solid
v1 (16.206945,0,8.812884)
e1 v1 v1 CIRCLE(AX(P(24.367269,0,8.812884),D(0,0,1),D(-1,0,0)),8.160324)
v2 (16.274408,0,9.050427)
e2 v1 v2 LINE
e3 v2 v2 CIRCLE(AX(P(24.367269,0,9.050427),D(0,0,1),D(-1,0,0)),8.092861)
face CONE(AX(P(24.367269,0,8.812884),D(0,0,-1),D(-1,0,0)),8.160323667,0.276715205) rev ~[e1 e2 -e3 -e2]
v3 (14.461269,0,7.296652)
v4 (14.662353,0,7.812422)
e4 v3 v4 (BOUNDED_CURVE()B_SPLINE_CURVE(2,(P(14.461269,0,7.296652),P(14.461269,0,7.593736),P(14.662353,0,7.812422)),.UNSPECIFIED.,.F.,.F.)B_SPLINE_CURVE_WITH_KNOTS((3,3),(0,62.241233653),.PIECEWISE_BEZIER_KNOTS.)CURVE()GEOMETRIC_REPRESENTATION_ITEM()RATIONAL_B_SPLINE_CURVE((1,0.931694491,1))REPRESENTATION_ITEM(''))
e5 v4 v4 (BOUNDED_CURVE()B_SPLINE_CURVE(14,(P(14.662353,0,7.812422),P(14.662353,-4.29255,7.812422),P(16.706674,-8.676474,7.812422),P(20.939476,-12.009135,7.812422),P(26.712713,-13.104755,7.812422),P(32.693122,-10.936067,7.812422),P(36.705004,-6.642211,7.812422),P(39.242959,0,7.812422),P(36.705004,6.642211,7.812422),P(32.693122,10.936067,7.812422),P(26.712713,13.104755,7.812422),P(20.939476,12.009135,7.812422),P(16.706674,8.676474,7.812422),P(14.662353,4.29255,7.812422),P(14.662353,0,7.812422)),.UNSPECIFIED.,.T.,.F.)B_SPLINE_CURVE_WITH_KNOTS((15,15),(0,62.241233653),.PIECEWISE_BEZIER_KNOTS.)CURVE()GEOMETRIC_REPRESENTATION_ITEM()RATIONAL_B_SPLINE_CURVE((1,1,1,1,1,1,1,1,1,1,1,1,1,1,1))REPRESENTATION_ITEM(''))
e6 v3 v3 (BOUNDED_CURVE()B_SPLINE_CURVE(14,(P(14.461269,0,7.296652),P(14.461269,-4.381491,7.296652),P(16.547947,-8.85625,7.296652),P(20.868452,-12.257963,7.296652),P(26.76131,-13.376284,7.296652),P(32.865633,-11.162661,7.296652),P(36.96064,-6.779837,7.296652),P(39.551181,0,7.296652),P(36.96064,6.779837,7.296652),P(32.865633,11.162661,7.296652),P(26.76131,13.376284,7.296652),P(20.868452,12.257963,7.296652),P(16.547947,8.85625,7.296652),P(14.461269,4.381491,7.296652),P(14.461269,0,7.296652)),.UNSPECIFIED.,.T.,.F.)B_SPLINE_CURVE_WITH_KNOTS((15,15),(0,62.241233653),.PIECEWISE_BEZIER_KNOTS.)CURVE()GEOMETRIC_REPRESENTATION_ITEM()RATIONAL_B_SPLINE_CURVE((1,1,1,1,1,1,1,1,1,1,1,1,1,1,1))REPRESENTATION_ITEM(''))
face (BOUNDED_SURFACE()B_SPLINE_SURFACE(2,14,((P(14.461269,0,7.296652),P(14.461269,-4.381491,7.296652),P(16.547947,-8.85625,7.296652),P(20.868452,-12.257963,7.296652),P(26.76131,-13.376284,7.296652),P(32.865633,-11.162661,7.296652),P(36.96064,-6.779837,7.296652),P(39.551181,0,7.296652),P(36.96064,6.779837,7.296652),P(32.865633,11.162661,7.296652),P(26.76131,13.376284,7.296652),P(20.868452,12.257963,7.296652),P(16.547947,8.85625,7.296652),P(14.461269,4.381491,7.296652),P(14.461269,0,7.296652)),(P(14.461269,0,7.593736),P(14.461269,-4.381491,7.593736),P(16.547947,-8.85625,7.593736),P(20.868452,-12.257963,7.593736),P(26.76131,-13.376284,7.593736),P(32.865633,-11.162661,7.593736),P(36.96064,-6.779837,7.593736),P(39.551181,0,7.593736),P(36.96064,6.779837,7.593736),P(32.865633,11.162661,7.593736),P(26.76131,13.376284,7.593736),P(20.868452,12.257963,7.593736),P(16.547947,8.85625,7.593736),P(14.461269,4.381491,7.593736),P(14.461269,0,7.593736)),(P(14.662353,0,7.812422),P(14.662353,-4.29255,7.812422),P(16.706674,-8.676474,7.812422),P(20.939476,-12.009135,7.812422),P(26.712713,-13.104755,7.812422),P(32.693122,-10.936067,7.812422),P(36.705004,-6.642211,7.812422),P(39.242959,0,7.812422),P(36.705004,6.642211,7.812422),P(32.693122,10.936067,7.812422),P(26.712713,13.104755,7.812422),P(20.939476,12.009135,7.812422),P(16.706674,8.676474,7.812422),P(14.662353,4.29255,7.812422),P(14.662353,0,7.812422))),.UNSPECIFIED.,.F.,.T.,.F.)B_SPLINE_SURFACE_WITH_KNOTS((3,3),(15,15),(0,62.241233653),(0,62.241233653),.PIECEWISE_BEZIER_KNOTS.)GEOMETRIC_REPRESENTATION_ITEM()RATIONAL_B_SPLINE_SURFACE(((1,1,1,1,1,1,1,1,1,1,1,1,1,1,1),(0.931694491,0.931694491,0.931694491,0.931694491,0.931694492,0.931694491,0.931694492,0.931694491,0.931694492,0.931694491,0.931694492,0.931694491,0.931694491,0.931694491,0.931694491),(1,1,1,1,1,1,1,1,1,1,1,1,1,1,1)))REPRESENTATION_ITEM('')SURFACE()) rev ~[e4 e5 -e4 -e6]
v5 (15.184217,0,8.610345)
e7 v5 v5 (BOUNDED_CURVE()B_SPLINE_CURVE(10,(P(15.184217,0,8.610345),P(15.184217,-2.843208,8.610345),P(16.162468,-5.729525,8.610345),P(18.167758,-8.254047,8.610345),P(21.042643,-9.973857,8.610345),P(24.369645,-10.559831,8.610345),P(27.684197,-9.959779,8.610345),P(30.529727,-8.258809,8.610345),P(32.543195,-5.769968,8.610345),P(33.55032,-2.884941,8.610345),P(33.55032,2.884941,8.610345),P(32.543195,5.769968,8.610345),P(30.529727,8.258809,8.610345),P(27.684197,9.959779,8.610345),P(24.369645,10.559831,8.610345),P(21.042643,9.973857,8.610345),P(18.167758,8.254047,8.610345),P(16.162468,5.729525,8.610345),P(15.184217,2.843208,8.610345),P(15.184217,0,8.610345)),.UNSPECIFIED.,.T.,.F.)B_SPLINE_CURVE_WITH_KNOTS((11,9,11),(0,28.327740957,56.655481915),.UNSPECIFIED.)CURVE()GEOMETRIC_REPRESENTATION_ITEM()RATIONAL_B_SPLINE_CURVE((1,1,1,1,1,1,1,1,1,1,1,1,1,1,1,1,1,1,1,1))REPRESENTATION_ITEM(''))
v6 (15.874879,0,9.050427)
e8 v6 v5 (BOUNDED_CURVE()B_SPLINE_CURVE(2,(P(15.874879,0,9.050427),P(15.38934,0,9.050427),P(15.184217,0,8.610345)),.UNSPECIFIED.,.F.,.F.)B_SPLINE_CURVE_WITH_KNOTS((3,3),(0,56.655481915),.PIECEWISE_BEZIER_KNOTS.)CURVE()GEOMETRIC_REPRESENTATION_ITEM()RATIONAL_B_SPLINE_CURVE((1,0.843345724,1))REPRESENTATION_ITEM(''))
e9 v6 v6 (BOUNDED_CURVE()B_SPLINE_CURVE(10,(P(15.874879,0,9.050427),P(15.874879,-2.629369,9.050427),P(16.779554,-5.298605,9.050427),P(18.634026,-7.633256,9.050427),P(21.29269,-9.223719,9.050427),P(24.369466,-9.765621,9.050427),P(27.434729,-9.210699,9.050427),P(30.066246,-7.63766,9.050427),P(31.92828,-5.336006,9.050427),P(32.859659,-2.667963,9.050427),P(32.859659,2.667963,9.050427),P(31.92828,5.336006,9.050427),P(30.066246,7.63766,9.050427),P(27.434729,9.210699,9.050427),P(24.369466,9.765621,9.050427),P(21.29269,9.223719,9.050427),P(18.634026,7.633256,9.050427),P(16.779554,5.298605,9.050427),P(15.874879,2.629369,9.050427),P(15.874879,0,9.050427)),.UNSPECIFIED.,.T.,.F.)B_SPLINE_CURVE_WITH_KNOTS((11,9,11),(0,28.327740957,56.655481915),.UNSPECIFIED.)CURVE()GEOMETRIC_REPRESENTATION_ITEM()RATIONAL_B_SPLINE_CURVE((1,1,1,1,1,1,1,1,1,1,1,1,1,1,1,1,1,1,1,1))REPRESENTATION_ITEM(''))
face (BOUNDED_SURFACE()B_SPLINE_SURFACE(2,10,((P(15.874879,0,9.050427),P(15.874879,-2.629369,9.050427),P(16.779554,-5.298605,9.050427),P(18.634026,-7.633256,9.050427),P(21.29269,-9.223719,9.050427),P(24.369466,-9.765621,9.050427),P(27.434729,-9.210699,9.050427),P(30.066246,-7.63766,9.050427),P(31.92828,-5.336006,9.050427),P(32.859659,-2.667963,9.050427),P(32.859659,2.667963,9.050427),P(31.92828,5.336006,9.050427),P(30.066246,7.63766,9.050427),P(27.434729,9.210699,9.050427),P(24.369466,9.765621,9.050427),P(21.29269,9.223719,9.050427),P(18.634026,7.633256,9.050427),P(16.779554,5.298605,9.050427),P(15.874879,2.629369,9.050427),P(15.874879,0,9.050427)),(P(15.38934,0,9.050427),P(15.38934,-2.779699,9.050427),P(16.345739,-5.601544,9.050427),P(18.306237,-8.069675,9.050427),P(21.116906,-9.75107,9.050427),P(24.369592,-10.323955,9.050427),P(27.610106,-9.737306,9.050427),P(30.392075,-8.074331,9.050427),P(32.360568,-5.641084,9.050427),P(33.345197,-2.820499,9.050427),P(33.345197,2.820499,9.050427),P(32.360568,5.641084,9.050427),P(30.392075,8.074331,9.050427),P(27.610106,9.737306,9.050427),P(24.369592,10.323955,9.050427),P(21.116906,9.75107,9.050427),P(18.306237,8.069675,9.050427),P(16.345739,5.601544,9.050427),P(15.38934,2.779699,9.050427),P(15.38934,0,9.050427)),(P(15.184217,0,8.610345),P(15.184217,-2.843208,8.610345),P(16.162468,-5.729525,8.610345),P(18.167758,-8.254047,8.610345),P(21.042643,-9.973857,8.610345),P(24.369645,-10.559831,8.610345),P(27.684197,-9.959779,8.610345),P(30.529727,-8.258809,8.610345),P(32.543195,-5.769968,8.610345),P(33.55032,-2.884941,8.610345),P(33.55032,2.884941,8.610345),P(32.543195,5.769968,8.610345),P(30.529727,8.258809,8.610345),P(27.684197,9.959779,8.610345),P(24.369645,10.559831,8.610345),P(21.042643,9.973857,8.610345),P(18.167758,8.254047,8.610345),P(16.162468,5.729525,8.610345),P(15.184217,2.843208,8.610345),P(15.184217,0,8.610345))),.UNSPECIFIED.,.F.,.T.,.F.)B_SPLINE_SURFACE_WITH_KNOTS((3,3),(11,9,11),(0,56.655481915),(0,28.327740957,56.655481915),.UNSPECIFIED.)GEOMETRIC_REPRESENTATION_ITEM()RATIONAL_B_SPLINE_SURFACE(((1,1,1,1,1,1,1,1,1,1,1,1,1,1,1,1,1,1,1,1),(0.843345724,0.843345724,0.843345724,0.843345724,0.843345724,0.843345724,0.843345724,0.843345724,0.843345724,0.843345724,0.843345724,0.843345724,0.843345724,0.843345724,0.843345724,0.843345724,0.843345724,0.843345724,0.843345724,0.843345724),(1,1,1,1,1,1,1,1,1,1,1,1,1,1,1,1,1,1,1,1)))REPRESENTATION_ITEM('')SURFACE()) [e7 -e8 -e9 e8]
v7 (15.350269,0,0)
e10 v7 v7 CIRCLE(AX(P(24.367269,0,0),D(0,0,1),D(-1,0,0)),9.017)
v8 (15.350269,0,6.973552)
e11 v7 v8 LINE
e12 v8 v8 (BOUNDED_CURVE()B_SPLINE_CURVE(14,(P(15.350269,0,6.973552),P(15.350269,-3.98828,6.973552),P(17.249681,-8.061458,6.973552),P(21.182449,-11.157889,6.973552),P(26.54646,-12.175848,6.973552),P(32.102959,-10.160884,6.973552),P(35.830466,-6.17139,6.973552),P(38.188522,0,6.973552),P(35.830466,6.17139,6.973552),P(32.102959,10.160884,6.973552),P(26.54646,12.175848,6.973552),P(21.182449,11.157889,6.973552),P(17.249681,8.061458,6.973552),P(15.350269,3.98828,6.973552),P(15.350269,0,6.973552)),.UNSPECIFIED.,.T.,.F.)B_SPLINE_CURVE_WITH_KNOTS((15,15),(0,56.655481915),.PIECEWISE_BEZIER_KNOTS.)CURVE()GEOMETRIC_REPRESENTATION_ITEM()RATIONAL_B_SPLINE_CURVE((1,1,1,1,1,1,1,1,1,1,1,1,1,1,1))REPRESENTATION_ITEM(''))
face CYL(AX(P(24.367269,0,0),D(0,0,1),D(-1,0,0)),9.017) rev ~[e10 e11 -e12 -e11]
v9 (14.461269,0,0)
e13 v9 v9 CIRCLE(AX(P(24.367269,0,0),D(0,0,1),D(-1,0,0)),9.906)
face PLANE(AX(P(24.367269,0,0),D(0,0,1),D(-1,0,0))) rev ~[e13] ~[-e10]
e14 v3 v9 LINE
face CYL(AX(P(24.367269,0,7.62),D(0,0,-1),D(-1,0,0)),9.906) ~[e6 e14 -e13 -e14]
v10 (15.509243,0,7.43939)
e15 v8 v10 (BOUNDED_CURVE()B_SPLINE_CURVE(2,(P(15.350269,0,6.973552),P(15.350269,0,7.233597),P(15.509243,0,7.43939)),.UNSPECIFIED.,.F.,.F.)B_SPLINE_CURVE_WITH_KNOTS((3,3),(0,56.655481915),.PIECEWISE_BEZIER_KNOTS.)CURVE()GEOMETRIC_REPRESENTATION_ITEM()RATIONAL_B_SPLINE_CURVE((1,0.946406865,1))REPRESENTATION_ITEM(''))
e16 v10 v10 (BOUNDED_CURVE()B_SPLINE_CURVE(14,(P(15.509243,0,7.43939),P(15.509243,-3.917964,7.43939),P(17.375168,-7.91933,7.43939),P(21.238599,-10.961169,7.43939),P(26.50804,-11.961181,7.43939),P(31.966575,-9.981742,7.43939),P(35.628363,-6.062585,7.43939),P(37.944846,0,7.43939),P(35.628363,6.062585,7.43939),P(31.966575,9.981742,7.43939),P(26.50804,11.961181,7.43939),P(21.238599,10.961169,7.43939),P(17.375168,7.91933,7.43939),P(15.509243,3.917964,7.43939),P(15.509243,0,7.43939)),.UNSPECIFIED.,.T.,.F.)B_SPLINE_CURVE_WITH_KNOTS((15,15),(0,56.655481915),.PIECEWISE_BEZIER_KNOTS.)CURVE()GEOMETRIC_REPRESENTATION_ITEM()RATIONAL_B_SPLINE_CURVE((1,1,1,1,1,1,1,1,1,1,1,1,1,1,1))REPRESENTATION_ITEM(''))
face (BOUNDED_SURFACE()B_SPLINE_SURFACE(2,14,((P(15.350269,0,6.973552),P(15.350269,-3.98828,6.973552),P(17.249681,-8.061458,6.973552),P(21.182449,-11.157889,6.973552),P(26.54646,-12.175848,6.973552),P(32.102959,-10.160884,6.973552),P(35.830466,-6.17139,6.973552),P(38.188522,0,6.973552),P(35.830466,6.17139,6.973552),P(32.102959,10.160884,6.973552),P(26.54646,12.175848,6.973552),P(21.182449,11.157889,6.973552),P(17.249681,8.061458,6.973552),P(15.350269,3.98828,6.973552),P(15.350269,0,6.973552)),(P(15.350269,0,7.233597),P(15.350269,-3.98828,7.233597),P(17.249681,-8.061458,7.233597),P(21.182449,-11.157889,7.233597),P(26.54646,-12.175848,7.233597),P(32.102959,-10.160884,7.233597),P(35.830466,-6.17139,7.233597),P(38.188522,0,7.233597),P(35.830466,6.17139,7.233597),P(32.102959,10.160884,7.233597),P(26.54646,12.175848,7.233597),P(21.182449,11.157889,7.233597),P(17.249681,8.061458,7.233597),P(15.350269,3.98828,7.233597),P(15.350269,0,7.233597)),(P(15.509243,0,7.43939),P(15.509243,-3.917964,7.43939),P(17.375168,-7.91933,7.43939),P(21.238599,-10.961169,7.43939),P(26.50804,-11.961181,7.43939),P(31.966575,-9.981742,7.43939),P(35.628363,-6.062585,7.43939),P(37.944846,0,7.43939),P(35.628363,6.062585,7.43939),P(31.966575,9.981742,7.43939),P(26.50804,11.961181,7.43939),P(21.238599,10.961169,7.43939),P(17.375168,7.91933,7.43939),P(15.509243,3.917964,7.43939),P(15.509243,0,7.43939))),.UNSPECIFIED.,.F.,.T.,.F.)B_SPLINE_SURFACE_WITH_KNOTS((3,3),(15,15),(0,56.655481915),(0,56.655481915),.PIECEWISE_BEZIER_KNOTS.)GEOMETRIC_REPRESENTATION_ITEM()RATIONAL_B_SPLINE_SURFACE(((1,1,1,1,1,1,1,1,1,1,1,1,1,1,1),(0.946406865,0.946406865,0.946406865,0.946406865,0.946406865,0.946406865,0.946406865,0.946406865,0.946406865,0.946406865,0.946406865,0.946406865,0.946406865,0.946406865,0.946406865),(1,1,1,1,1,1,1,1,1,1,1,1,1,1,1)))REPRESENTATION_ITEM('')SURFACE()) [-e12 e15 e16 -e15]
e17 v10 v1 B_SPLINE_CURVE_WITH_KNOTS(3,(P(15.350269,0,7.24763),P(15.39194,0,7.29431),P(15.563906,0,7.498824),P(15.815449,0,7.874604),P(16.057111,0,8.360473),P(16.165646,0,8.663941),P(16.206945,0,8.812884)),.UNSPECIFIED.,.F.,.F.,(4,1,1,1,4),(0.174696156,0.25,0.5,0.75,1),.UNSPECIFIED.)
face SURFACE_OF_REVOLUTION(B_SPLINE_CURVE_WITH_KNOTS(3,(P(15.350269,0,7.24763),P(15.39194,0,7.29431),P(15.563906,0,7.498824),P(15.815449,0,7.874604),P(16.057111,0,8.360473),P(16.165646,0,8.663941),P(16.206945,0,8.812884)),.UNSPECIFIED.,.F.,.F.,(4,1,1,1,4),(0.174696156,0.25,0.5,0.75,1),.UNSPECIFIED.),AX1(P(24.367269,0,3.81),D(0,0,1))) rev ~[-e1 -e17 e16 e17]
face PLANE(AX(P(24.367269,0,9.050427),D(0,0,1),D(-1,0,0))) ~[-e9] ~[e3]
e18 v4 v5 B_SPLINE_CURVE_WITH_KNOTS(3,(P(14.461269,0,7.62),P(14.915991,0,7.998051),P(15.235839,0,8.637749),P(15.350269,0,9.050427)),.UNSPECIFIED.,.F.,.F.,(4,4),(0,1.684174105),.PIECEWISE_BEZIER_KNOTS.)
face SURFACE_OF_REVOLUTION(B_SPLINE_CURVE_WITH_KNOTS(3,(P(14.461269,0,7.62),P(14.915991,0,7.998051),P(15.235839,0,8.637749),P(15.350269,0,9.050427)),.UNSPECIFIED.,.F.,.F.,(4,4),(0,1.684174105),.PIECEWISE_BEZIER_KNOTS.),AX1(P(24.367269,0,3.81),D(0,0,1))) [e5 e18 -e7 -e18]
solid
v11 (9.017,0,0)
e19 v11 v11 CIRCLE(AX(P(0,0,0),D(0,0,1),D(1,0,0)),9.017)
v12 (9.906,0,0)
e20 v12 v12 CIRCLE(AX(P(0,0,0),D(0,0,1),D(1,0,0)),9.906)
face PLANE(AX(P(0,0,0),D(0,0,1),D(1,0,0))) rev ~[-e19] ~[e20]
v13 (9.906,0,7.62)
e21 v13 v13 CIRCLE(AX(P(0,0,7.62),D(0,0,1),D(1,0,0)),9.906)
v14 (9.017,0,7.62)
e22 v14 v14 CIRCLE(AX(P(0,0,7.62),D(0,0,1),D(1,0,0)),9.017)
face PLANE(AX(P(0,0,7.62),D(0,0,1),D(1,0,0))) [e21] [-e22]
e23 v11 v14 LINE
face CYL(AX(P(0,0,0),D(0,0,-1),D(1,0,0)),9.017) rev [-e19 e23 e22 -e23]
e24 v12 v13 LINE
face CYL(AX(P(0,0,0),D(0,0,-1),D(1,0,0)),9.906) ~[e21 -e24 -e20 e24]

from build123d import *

# Parameters (mm, degrees)
F0_R     = 9.906
F0_R_2   = 9.017
F1_DEPTH = 7.62
F4_R     = 0.762


# Not quite as in the source:
# - ends of sketch curves that miss each other by under 0.0002 mm in the source are joined


with BuildPart() as f1:
    # F0 (on Top) → F1 (new body)
    with BuildSketch(Plane.XY):
        Circle(F0_R)
        Circle(F0_R_2, mode=Mode.SUBTRACT)
    extrude(amount=F1_DEPTH)


with BuildPart() as f3:
    # F2 (on Front) → F3 (revolve)
    with BuildSketch(Plane.XZ):
        with BuildLine():
            Line((14.4612686709, 7.62), (14.4612686709, 0))
            Line((14.4612686709, 0), (15.3502686709, 0))
            Line((15.3502686709, 0), (15.3502686709, 7.2476301639))
            add(Edge.make_bspline(
                [(15.3502686709, 7.2476301639), (15.3919398222, 7.2943099028), (15.563906281, 7.4988239117), (15.8154492473, 7.8746040023), (16.057110979, 8.3604725059), (16.165645556, 8.6639414702), (16.2069450038, 8.812884039)],
                knots=[0.1746961563, 0.1746961563, 0.1746961563, 0.1746961563, 0.25, 0.5, 0.75, 1, 1, 1, 1], degree=3))
            Line((16.2069450038, 8.812884039), (16.274407506, 9.0504270047))
            Line((16.274407506, 9.0504270047), (15.3502686709, 9.0504270047))
            add(Edge.make_bspline(
                [(14.4612686709, 7.62), (14.9159906432, 7.9980511218), (15.2358394116, 8.6377486587), (15.3502686709, 9.0504270047)],
                knots=[0, 0, 0, 0, 1.6841741049, 1.6841741049, 1.6841741049, 1.6841741049], degree=3))
        make_face()
    revolve(axis=Axis((24.3672686709, 0, 3.81), (0, 0, 1)))

    # F4
    f4_edges = [f3.edges().sort_by_distance(p)[0] for p in [
        (34.273269, 0, 7.62),
        (33.384269, 0, 9.050427),
        (33.384269, 0, 7.24763),
    ]]
    fillet(f4_edges, radius=F4_R)


solid = Compound([f1.part, f3.part])
